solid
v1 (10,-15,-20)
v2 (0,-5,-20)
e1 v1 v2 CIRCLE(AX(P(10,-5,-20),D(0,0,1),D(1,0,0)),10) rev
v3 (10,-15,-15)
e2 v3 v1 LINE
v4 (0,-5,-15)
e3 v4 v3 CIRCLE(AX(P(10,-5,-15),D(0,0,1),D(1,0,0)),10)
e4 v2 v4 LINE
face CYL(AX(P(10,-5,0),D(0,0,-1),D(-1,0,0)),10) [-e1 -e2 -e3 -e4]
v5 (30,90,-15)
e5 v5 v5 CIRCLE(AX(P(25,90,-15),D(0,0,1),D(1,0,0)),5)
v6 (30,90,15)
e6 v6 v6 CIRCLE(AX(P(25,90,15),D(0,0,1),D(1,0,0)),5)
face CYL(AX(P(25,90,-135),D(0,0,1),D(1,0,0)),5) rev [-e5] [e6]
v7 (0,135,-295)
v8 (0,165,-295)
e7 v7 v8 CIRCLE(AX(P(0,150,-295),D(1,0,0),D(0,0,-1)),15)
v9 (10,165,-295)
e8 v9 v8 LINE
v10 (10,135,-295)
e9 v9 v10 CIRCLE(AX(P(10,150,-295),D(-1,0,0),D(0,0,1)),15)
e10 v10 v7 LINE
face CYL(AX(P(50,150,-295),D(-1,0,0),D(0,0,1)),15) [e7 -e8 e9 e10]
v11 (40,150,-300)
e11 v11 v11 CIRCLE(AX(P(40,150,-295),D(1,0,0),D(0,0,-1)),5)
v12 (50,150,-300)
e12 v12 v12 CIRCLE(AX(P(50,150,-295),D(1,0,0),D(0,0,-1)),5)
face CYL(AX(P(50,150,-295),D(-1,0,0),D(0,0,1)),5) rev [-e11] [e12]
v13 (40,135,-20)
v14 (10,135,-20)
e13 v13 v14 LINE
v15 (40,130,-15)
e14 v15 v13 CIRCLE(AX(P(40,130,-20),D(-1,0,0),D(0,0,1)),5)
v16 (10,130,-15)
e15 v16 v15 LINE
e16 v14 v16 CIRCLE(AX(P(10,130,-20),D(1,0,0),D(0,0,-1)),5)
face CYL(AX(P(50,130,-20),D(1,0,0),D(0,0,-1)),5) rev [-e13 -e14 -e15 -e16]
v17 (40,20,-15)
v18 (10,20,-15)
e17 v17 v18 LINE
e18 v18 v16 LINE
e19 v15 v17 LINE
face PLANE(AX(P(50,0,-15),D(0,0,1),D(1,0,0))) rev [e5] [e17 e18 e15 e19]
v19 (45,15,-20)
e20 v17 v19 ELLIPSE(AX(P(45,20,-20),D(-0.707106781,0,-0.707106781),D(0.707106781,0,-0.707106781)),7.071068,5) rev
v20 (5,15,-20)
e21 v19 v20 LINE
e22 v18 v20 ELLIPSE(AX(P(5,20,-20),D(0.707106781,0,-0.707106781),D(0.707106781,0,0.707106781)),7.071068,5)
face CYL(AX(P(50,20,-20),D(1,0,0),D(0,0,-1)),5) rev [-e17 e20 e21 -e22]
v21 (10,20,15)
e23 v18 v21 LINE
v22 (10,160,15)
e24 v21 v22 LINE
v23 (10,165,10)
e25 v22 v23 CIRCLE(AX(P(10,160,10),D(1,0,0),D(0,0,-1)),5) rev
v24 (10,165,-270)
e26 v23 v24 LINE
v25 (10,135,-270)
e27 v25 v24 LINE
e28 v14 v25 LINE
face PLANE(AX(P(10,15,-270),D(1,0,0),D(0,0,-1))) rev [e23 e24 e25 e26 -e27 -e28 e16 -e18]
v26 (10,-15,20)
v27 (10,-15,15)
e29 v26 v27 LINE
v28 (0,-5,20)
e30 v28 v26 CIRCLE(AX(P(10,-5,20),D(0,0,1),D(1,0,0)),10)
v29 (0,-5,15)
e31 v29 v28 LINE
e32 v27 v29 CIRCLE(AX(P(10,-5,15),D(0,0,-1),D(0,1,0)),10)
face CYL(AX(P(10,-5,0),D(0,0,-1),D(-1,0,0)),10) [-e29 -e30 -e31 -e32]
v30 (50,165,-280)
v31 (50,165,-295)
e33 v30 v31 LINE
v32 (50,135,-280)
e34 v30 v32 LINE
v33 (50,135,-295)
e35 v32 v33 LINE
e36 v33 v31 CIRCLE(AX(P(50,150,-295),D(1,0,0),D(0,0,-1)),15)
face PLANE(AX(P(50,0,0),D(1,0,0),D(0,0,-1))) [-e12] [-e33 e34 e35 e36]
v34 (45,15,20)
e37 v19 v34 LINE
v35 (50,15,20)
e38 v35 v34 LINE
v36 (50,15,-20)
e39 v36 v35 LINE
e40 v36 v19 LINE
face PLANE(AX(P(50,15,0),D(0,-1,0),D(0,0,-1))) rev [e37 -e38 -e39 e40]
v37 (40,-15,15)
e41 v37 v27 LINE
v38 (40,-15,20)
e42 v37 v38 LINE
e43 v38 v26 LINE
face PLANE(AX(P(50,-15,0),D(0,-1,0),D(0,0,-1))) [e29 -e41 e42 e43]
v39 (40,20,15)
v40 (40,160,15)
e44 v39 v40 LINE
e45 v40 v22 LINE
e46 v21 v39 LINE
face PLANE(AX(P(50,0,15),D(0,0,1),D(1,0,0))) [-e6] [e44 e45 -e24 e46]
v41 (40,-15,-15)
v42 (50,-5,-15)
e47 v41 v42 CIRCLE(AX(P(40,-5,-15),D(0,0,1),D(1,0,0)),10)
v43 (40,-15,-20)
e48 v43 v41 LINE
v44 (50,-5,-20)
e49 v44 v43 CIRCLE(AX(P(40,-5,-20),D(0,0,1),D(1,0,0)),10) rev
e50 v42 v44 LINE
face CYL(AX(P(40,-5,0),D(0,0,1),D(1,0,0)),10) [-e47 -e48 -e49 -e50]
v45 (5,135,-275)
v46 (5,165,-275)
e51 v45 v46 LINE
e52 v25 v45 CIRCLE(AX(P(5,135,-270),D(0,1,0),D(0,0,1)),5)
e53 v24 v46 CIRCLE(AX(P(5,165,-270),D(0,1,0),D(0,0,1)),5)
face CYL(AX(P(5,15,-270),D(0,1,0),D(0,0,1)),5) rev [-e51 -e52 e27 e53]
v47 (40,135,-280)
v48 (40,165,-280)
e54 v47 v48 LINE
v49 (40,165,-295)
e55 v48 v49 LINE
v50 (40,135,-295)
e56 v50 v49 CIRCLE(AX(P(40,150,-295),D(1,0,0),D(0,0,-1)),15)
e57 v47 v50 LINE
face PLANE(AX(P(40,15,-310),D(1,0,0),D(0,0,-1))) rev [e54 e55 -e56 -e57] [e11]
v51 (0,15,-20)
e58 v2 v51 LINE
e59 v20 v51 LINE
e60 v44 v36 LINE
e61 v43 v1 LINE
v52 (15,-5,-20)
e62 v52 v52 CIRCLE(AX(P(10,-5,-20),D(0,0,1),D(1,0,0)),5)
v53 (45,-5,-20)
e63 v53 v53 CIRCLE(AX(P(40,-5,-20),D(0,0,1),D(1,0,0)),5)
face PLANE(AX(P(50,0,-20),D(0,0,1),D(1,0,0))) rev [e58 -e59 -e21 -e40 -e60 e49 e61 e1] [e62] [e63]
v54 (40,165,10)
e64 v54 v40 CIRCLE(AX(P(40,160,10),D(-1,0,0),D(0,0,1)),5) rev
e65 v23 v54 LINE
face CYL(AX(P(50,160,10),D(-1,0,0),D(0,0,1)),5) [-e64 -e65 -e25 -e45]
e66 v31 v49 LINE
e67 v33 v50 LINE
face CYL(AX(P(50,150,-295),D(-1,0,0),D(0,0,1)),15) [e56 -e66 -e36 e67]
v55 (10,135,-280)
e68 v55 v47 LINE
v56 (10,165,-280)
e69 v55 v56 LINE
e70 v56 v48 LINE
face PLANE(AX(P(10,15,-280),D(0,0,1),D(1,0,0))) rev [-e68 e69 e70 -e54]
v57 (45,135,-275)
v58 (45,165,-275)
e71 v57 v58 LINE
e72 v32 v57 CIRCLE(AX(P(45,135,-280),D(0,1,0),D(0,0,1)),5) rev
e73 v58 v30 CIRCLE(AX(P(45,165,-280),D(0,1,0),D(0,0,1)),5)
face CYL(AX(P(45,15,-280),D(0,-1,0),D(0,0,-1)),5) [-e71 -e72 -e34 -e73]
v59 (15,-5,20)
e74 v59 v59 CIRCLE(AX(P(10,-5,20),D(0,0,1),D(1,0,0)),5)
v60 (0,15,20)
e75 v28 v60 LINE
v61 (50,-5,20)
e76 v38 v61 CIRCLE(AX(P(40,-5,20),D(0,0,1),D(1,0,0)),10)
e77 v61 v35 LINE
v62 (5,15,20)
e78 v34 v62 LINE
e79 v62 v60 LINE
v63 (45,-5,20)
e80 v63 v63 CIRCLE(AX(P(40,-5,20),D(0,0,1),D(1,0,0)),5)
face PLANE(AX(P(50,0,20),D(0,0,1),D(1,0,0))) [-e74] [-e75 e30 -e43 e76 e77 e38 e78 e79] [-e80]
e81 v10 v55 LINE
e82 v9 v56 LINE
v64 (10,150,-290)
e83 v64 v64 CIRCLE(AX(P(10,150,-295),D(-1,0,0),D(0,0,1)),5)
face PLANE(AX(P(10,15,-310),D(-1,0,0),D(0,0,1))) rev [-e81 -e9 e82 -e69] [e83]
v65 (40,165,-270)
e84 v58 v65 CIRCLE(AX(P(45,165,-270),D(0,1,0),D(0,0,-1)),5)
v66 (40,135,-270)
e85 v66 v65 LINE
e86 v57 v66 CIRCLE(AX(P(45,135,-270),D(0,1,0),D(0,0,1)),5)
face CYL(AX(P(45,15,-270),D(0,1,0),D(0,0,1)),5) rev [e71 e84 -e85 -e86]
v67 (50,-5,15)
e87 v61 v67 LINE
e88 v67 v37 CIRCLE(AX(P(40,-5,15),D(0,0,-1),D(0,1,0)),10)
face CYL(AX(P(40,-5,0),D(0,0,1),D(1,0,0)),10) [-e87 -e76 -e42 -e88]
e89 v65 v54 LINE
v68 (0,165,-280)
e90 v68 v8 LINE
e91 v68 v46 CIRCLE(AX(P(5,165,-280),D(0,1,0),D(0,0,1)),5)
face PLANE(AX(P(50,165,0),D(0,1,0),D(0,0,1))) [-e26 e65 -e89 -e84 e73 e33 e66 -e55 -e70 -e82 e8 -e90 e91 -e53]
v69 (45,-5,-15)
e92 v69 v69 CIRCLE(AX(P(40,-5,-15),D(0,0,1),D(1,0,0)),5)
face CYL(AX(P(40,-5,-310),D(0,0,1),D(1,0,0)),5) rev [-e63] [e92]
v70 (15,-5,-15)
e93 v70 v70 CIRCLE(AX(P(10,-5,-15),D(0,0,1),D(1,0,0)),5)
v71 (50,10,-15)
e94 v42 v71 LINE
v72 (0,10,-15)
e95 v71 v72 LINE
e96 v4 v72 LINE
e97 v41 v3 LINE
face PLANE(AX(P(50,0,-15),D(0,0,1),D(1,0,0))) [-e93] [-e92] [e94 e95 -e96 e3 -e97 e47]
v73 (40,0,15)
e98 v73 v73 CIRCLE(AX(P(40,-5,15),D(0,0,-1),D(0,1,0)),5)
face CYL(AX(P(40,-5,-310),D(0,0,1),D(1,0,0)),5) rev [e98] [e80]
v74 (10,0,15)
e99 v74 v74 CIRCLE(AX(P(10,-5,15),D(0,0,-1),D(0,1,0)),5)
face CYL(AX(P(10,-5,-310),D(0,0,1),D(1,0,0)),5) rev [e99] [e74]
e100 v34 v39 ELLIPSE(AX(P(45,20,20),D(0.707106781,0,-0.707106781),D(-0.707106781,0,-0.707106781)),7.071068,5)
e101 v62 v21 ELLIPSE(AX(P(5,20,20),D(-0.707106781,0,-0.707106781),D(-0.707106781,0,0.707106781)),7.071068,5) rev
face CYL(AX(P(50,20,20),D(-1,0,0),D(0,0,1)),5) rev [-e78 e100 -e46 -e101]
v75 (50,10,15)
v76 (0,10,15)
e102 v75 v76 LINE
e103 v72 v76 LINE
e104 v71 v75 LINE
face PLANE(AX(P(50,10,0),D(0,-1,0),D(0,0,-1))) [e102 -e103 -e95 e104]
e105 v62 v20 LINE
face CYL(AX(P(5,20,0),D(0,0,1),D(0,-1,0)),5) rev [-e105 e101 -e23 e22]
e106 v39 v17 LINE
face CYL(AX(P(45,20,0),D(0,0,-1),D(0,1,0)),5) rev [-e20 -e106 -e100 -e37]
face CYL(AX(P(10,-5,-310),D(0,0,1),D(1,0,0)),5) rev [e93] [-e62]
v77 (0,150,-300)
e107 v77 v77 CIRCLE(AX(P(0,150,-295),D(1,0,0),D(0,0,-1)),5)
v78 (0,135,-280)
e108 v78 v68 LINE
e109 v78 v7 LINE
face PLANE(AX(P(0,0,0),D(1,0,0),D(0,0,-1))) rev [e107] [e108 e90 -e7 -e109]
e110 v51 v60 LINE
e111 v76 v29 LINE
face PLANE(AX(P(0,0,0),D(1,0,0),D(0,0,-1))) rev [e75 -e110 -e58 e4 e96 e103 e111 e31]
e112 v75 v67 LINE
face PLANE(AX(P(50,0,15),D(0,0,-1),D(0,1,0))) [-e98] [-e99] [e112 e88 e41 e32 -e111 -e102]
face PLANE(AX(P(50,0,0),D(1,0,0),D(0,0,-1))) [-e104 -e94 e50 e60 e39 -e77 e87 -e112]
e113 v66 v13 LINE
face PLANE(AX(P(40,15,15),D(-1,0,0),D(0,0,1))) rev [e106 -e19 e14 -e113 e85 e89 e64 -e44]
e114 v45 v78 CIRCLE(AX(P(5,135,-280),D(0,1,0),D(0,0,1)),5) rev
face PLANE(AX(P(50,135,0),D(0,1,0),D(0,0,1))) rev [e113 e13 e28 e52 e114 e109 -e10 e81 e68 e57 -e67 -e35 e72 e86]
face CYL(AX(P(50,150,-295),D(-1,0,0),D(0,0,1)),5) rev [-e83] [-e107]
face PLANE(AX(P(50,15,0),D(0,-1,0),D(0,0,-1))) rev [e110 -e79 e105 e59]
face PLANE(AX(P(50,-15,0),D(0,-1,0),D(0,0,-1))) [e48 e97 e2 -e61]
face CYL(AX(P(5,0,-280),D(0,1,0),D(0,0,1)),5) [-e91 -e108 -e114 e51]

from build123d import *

# Parameters (mm, degrees)
SKETCH1_R           = 5
BOSS_EXTRUDE1_DEPTH = 50
SKETCH2_W           = 30
SKETCH2_H           = 30
CUT_EXTRUDE1_DEPTH  = 150
SKETCH3_R           = 5
CUT_EXTRUDE2_DEPTH  = 373.323783823
FILLET1_R           = 10
FILLET2_R           = 5
FILLET3_R           = 5
SKETCH4_R           = 5
CUT_EXTRUDE3_DEPTH  = 150


with BuildPart() as part:
    # Sketch1 → Boss-Extrude1 (new body)
    with BuildSketch(Plane(origin=(0, 0, 0), x_dir=(0, 0, -1), z_dir=(1, 0, 0))):
        with BuildLine():
            Line((-15, 165), (-15, 15))
            Line((-15, 15), (-20, 15))
            Line((-20, 15), (-20, -15))
            Line((-20, -15), (-15, -15))
            Line((-15, -15), (-15, 10))
            Line((-15, 10), (15, 10))
            Line((15, 10), (15, -15))
            Line((15, -15), (20, -15))
            Line((20, -15), (20, 15))
            Line((20, 15), (15, 15))
            Line((15, 15), (15, 135))
            Line((15, 135), (295, 135))
            ThreePointArc((295, 135), (310, 150), (295, 165))
            Line((295, 165), (-15, 165))
        make_face()
        with Locations((295, 150)):
            Circle(SKETCH1_R, mode=Mode.SUBTRACT)
    extrude(amount=BOSS_EXTRUDE1_DEPTH)

    # Sketch2 → Cut-Extrude1 (cut)
    with BuildSketch(Plane(origin=(0, 165, 0), x_dir=(1, 0, 0), z_dir=(0, 1, 0))):
        with Locations((25, 295)):
            Rectangle(SKETCH2_W, SKETCH2_H)
        with BuildLine():
            Line((0, 275), (5, 275))
            ThreePointArc((5, 275), (8.535533906, 273.535533906), (10, 270))
            Line((10, 270), (10, -15))
            Line((10, -15), (0, -15))
            Line((0, -15), (0, 275))
        make_face()
        with BuildLine():
            Line((50, -15), (40, -15))
            Line((40, -15), (40, 270))
            ThreePointArc((40, 270), (41.464466094, 273.535533906), (45, 275))
            Line((45, 275), (50, 275))
            Line((50, 275), (50, -15))
        make_face()
    extrude(amount=-CUT_EXTRUDE1_DEPTH, mode=Mode.SUBTRACT)

    # Sketch3 → Cut-Extrude2 (cut, through all)
    with BuildSketch(Plane.XY.offset(20)):
        with Locations((10, -5)):
            Circle(SKETCH3_R)
        with Locations((40, -5)):
            Circle(SKETCH3_R)
    extrude(amount=-CUT_EXTRUDE2_DEPTH, mode=Mode.SUBTRACT)

    # Fillet1
    fillet1_edges = [part.edges().sort_by_distance(p)[0] for p in [
        (0, -15, -17.5),
        (50, -15, 17.5),
        (0, -15, 17.5),
        (50, -15, -17.5),
    ]]
    fillet(fillet1_edges, radius=FILLET1_R)

    # Fillet2
    fillet2_edges = [part.edges().sort_by_distance(p)[0] for p in [
        (25, 165, 15),
        (25, 135, -15),
        (25, 15, -15),
        (25, 15, 15),
        (10, 15, 0),
        (40, 15, 0),
    ]]
    fillet(fillet2_edges, radius=FILLET2_R - 0.0001)  # a hair under: the kernel refuses the full size

    # Fillet3
    fillet3_edges = [part.edges().sort_by_distance(p)[0] for p in [
        (0, 150, -275),
        (50, 150, -275),
    ]]
    fillet(fillet3_edges, radius=FILLET3_R - 0.0001)  # a hair under: the kernel refuses the full size

    # Sketch4 → Cut-Extrude3 (cut)
    with BuildSketch(Plane.XY.offset(15)):
        with Locations((25, 90)):
            Circle(SKETCH4_R)
    extrude(amount=-CUT_EXTRUDE3_DEPTH, mode=Mode.SUBTRACT)


solid = part.part
